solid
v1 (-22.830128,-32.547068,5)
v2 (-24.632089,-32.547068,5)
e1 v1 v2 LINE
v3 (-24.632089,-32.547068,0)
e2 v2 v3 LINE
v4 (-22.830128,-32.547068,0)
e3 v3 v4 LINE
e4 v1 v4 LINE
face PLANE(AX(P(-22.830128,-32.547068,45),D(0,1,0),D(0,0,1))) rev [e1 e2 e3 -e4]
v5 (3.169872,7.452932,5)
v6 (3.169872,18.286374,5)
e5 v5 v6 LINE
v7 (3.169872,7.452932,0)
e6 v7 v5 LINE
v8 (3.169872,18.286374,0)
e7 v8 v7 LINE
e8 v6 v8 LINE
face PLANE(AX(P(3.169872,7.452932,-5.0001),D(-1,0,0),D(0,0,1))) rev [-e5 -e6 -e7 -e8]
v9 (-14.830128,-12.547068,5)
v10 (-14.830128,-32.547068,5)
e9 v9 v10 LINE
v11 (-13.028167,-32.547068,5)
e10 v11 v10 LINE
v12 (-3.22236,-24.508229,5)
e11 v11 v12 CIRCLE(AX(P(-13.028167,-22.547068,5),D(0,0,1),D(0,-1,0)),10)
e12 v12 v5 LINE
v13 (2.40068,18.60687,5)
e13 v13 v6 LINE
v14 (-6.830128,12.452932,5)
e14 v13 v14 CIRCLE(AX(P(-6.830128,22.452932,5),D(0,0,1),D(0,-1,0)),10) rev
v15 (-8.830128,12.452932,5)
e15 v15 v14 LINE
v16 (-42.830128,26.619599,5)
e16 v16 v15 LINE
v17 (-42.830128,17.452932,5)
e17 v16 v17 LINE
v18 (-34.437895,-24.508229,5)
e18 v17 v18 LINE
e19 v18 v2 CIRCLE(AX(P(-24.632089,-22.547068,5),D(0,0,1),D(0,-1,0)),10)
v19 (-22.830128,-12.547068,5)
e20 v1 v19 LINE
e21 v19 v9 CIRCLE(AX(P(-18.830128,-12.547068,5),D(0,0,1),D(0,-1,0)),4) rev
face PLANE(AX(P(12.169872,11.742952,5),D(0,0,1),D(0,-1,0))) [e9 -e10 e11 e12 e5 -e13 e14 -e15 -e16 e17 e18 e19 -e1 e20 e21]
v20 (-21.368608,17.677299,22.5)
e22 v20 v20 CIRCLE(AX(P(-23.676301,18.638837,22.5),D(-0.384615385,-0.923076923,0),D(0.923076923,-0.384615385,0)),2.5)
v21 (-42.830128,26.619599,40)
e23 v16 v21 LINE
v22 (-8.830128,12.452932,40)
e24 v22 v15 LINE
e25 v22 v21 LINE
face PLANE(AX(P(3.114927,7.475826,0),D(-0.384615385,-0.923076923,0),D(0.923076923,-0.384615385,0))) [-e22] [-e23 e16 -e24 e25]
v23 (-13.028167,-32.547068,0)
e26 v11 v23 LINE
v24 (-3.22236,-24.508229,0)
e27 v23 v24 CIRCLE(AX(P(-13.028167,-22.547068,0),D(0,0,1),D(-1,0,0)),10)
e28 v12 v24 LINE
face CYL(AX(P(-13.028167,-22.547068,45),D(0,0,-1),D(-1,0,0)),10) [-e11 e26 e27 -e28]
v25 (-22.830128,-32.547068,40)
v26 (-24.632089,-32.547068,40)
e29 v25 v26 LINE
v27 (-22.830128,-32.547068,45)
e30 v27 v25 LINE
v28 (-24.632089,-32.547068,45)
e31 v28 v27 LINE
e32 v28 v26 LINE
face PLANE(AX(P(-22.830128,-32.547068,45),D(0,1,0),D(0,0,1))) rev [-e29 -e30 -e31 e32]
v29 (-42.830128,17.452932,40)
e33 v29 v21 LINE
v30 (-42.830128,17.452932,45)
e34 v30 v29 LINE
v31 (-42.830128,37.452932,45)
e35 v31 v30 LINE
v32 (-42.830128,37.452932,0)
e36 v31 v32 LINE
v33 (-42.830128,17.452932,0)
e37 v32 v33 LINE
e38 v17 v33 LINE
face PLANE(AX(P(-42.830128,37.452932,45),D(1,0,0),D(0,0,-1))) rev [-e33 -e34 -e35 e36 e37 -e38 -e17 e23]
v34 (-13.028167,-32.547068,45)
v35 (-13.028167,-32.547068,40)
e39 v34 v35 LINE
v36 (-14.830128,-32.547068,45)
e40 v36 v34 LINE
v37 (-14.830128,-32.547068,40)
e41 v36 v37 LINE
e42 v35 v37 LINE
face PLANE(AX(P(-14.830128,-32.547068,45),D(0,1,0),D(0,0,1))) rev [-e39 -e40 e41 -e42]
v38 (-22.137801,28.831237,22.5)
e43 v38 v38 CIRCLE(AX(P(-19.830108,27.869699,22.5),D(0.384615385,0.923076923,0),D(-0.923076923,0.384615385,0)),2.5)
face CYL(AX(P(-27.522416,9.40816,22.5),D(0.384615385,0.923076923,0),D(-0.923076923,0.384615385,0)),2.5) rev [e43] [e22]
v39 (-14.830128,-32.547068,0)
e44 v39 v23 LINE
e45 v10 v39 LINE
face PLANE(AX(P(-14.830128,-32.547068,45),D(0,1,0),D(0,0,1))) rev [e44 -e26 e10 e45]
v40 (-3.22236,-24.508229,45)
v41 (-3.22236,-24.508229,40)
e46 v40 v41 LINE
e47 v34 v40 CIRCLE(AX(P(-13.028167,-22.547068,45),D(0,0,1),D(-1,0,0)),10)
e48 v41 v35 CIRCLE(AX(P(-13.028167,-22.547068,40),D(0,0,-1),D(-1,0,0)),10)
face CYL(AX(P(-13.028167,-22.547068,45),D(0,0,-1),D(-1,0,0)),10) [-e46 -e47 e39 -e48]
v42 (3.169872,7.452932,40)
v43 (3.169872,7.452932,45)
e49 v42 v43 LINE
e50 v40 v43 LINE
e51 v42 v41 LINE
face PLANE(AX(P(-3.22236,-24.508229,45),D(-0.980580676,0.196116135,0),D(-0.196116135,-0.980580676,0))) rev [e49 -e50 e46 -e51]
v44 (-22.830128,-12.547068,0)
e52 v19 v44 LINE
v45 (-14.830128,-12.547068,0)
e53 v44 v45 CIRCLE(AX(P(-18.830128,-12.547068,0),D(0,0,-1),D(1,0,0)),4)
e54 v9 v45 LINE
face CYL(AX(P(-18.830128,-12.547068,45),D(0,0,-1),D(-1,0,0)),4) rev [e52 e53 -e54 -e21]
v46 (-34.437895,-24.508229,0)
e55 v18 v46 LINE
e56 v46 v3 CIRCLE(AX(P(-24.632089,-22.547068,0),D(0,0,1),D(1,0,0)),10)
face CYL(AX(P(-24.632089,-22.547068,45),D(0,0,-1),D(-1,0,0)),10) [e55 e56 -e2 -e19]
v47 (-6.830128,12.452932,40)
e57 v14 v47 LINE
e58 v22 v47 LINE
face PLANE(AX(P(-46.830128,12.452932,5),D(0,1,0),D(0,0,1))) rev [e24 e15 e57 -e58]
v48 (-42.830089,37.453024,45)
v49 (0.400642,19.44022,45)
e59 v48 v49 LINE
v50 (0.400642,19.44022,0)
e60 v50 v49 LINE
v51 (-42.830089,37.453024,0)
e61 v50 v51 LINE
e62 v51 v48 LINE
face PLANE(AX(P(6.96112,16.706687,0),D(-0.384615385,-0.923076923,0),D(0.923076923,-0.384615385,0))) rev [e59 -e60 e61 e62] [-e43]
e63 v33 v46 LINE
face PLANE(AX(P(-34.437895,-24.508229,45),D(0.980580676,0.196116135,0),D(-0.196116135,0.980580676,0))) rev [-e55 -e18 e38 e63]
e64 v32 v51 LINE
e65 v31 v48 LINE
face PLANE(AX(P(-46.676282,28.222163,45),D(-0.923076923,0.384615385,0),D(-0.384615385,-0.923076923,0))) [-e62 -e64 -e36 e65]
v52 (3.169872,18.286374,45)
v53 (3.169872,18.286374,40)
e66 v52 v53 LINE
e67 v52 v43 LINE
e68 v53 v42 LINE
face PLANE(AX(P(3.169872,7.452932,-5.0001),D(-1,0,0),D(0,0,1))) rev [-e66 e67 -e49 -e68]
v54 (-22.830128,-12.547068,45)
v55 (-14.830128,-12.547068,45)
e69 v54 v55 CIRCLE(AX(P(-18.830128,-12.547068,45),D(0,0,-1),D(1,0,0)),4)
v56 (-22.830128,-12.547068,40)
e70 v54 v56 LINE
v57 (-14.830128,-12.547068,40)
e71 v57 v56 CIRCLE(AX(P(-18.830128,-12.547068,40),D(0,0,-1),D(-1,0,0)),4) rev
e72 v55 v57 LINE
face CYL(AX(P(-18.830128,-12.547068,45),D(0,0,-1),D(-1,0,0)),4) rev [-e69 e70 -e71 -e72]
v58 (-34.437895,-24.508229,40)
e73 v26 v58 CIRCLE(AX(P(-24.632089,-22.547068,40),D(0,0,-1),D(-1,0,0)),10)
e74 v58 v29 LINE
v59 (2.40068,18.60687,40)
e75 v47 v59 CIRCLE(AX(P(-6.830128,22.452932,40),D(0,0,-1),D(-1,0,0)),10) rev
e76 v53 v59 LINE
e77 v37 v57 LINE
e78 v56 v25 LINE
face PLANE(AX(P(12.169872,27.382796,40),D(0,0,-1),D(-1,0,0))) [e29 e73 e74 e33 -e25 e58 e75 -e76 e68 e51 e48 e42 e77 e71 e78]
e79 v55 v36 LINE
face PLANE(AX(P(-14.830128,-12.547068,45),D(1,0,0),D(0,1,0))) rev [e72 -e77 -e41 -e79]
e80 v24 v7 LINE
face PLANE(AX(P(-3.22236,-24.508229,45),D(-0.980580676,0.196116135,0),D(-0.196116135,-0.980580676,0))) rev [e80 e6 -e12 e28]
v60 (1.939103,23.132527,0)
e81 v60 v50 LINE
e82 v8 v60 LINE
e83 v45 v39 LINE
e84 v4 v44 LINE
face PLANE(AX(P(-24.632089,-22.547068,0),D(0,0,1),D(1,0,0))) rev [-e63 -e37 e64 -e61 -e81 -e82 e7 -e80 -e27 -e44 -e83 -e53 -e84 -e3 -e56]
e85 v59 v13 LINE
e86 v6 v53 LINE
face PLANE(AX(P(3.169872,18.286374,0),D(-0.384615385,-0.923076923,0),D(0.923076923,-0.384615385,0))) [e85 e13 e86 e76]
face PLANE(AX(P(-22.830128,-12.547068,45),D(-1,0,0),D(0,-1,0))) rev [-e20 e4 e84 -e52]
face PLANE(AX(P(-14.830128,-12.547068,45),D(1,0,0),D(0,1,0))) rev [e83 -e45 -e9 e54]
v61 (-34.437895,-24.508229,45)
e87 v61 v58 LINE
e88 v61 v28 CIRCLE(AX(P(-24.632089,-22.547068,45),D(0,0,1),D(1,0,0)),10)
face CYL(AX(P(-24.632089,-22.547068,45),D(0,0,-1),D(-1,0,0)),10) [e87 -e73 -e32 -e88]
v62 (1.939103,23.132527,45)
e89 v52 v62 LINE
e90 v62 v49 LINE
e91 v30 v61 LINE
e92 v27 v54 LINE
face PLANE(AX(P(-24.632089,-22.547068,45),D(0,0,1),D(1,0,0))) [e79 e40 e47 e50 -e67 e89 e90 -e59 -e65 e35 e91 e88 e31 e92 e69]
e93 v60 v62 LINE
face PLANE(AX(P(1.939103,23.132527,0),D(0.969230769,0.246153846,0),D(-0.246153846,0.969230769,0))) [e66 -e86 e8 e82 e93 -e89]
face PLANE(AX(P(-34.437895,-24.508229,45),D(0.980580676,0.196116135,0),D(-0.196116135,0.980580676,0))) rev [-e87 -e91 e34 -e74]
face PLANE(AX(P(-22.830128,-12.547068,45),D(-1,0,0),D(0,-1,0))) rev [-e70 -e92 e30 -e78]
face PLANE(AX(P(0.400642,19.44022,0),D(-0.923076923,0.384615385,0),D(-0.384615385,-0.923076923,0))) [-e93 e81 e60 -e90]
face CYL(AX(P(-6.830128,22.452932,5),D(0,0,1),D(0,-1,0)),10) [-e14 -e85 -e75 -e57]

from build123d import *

# Parameters (mm, degrees)
SALIENTE_EXTRUIR1_DEPTH      = 45
CORTAR_EXTRUIR1_DEPTH        = 35
CORTAR_EXTRUIR1_DEPTH_BACK   = 25
SALIENTE_EXTRUIR2_DEPTH      = 0.0001
SALIENTE_EXTRUIR2_DEPTH_BACK = 10
CORTAR_EXTRUIR2_DEPTH        = 50.0001
CROQUIS5_R                   = 2.5
CORTAR_EXTRUIR3_DEPTH        = 20
CROQUIS6_W                   = 35
CROQUIS6_H                   = 5
CORTAR_EXTRUIR4_DEPTH        = 50
REDONDEO7_R                  = 10
SALIENTE_EXTRUIR3_DEPTH      = 45


with BuildPart() as part:
    # Croquis1 → Saliente-Extruir1 (new body)
    with BuildSketch(Plane.XY):
        with BuildLine():
            Line((5.169872345, 17.452931937), (-42.830127655, 37.452931937))
            Line((-42.830127655, 37.452931937), (-42.830127655, 17.452931937))
            Line((-42.830127655, 17.452931937), (-34.437895384, -24.508229414))
            ThreePointArc((-34.437895384, -24.508229414), (-30.971977683, -30.280489476), (-24.632088627, -32.547068063))
            Line((-24.632088627, -32.547068063), (-22.830127655, -32.547068063))
            Line((-22.830127655, -32.547068063), (-22.830127655, -12.547068063))
            ThreePointArc((-22.830127655, -12.547068063), (-18.830127655, -8.547068063), (-14.830127655, -12.547068063))
            Line((-14.830127655, -12.547068063), (-14.830127655, -32.547068063))
            Line((-14.830127655, -32.547068063), (-13.028166682, -32.547068063))
            ThreePointArc((-13.028166682, -32.547068063), (-6.688277626, -30.280489476), (-3.222359925, -24.508229414))
            Line((-3.222359925, -24.508229414), (5.169872345, 17.452931937))
        make_face()
    extrude(amount=SALIENTE_EXTRUIR1_DEPTH)

    # Croquis2 → Cortar-Extruir1 (cut, two sides: drawn at the far end of the back side and taken through both)
    with BuildSketch(Plane(origin=(-22.830127655, 0, 0), x_dir=(0, 0, -1), z_dir=(1, 0, 0)).offset(-CORTAR_EXTRUIR1_DEPTH_BACK)):
        Polygon((-40, -32.547068063), (-5, -32.547068063), (-5, 11.74295153), (-5, 27.452931937), (-40, 27.382795607), (-40, 11.74295153), align=None)
    extrude(amount=CORTAR_EXTRUIR1_DEPTH + CORTAR_EXTRUIR1_DEPTH_BACK, mode=Mode.SUBTRACT)

    # Croquis3 → Saliente-Extruir2 (add, two sides: drawn at the far end of the back side and taken through both)
    with BuildSketch(Plane(origin=(6.961081212, 16.706594909, 0), x_dir=(0.9230769230769231, -0.38461538461538447, 0), z_dir=(0.38461538461538447, 0.9230769230769231, 0)).offset(-SALIENTE_EXTRUIR2_DEPTH_BACK)):
        Polygon((-53.940476272, -45), (-53.940476272, 0), (-1.940476272, 0), (5.740404043, 0), (5.740404043, -45), (-1.940476272, -45), align=None)
    extrude(amount=SALIENTE_EXTRUIR2_DEPTH + SALIENTE_EXTRUIR2_DEPTH_BACK)

    # Croquis4 → Cortar-Extruir2 (cut)
    with BuildSketch(Plane.XY.offset(45)):
        Polygon((-42.830127655, 17.452931937), (-42.830127655, 41.659540507), (3.169872345, 41.659540507), (3.169872345, 7.452931937), (4.911234771, 4.934595431), (17.135740174, 1.881036512), (16.246125069, 53.47871262), (-56.321049949, 53.47871262), (-56.321049949, 17.452931937), align=None)
    extrude(amount=-CORTAR_EXTRUIR2_DEPTH, mode=Mode.SUBTRACT)

    # Croquis5 → Cortar-Extruir3 (cut)
    with BuildSketch(Plane(origin=(6.961119674, 16.706687217, 0), x_dir=(0.9230769230769231, -0.3846153846153847, 0), z_dir=(0.38461538461538464, 0.923076923076923, 0))):
        with Locations(Location((-29.023830439, -22.5, 0), (0, 0, 180))):
            Circle(CROQUIS5_R)
    extrude(amount=-CORTAR_EXTRUIR3_DEPTH, mode=Mode.SUBTRACT)

    # Croquis6 → Cortar-Extruir4 (cut)
    with BuildSketch(Plane(origin=(3.169872345, 0, 0), x_dir=(0, 0, -1), z_dir=(1, 0, 0))):
        with Locations((-22.5, 9.952931937)):
            Rectangle(CROQUIS6_W, CROQUIS6_H)
    extrude(amount=-CORTAR_EXTRUIR4_DEPTH, mode=Mode.SUBTRACT)

    # Redondeo7
    # the kernel refuses this fillet: 10 mm, written as the material it takes off along each edge
    with BuildSketch(Plane(origin=(3.169872345, 12.452931937, 40), x_dir=(-1, 0, 0), z_dir=(0, 0, -1))) as redondeo7_piece_1:
        with BuildLine():
            CenterArc((REDONDEO7_R, REDONDEO7_R), REDONDEO7_R, 180, 90)
            Line((0, REDONDEO7_R), (0, 0))
            Line((0, 0), (REDONDEO7_R, 0))
        make_face()
    extrude(amount=35, mode=Mode.SUBTRACT)

    # Croquis7 → Saliente-Extruir3 (add)
    with BuildSketch(Plane.XY.offset(45)):
        Polygon((0.400641576, 19.440219758), (1.939103115, 23.13252745), (3.169872345, 18.286373604), align=None)
    extrude(amount=-SALIENTE_EXTRUIR3_DEPTH)


solid = part.part
